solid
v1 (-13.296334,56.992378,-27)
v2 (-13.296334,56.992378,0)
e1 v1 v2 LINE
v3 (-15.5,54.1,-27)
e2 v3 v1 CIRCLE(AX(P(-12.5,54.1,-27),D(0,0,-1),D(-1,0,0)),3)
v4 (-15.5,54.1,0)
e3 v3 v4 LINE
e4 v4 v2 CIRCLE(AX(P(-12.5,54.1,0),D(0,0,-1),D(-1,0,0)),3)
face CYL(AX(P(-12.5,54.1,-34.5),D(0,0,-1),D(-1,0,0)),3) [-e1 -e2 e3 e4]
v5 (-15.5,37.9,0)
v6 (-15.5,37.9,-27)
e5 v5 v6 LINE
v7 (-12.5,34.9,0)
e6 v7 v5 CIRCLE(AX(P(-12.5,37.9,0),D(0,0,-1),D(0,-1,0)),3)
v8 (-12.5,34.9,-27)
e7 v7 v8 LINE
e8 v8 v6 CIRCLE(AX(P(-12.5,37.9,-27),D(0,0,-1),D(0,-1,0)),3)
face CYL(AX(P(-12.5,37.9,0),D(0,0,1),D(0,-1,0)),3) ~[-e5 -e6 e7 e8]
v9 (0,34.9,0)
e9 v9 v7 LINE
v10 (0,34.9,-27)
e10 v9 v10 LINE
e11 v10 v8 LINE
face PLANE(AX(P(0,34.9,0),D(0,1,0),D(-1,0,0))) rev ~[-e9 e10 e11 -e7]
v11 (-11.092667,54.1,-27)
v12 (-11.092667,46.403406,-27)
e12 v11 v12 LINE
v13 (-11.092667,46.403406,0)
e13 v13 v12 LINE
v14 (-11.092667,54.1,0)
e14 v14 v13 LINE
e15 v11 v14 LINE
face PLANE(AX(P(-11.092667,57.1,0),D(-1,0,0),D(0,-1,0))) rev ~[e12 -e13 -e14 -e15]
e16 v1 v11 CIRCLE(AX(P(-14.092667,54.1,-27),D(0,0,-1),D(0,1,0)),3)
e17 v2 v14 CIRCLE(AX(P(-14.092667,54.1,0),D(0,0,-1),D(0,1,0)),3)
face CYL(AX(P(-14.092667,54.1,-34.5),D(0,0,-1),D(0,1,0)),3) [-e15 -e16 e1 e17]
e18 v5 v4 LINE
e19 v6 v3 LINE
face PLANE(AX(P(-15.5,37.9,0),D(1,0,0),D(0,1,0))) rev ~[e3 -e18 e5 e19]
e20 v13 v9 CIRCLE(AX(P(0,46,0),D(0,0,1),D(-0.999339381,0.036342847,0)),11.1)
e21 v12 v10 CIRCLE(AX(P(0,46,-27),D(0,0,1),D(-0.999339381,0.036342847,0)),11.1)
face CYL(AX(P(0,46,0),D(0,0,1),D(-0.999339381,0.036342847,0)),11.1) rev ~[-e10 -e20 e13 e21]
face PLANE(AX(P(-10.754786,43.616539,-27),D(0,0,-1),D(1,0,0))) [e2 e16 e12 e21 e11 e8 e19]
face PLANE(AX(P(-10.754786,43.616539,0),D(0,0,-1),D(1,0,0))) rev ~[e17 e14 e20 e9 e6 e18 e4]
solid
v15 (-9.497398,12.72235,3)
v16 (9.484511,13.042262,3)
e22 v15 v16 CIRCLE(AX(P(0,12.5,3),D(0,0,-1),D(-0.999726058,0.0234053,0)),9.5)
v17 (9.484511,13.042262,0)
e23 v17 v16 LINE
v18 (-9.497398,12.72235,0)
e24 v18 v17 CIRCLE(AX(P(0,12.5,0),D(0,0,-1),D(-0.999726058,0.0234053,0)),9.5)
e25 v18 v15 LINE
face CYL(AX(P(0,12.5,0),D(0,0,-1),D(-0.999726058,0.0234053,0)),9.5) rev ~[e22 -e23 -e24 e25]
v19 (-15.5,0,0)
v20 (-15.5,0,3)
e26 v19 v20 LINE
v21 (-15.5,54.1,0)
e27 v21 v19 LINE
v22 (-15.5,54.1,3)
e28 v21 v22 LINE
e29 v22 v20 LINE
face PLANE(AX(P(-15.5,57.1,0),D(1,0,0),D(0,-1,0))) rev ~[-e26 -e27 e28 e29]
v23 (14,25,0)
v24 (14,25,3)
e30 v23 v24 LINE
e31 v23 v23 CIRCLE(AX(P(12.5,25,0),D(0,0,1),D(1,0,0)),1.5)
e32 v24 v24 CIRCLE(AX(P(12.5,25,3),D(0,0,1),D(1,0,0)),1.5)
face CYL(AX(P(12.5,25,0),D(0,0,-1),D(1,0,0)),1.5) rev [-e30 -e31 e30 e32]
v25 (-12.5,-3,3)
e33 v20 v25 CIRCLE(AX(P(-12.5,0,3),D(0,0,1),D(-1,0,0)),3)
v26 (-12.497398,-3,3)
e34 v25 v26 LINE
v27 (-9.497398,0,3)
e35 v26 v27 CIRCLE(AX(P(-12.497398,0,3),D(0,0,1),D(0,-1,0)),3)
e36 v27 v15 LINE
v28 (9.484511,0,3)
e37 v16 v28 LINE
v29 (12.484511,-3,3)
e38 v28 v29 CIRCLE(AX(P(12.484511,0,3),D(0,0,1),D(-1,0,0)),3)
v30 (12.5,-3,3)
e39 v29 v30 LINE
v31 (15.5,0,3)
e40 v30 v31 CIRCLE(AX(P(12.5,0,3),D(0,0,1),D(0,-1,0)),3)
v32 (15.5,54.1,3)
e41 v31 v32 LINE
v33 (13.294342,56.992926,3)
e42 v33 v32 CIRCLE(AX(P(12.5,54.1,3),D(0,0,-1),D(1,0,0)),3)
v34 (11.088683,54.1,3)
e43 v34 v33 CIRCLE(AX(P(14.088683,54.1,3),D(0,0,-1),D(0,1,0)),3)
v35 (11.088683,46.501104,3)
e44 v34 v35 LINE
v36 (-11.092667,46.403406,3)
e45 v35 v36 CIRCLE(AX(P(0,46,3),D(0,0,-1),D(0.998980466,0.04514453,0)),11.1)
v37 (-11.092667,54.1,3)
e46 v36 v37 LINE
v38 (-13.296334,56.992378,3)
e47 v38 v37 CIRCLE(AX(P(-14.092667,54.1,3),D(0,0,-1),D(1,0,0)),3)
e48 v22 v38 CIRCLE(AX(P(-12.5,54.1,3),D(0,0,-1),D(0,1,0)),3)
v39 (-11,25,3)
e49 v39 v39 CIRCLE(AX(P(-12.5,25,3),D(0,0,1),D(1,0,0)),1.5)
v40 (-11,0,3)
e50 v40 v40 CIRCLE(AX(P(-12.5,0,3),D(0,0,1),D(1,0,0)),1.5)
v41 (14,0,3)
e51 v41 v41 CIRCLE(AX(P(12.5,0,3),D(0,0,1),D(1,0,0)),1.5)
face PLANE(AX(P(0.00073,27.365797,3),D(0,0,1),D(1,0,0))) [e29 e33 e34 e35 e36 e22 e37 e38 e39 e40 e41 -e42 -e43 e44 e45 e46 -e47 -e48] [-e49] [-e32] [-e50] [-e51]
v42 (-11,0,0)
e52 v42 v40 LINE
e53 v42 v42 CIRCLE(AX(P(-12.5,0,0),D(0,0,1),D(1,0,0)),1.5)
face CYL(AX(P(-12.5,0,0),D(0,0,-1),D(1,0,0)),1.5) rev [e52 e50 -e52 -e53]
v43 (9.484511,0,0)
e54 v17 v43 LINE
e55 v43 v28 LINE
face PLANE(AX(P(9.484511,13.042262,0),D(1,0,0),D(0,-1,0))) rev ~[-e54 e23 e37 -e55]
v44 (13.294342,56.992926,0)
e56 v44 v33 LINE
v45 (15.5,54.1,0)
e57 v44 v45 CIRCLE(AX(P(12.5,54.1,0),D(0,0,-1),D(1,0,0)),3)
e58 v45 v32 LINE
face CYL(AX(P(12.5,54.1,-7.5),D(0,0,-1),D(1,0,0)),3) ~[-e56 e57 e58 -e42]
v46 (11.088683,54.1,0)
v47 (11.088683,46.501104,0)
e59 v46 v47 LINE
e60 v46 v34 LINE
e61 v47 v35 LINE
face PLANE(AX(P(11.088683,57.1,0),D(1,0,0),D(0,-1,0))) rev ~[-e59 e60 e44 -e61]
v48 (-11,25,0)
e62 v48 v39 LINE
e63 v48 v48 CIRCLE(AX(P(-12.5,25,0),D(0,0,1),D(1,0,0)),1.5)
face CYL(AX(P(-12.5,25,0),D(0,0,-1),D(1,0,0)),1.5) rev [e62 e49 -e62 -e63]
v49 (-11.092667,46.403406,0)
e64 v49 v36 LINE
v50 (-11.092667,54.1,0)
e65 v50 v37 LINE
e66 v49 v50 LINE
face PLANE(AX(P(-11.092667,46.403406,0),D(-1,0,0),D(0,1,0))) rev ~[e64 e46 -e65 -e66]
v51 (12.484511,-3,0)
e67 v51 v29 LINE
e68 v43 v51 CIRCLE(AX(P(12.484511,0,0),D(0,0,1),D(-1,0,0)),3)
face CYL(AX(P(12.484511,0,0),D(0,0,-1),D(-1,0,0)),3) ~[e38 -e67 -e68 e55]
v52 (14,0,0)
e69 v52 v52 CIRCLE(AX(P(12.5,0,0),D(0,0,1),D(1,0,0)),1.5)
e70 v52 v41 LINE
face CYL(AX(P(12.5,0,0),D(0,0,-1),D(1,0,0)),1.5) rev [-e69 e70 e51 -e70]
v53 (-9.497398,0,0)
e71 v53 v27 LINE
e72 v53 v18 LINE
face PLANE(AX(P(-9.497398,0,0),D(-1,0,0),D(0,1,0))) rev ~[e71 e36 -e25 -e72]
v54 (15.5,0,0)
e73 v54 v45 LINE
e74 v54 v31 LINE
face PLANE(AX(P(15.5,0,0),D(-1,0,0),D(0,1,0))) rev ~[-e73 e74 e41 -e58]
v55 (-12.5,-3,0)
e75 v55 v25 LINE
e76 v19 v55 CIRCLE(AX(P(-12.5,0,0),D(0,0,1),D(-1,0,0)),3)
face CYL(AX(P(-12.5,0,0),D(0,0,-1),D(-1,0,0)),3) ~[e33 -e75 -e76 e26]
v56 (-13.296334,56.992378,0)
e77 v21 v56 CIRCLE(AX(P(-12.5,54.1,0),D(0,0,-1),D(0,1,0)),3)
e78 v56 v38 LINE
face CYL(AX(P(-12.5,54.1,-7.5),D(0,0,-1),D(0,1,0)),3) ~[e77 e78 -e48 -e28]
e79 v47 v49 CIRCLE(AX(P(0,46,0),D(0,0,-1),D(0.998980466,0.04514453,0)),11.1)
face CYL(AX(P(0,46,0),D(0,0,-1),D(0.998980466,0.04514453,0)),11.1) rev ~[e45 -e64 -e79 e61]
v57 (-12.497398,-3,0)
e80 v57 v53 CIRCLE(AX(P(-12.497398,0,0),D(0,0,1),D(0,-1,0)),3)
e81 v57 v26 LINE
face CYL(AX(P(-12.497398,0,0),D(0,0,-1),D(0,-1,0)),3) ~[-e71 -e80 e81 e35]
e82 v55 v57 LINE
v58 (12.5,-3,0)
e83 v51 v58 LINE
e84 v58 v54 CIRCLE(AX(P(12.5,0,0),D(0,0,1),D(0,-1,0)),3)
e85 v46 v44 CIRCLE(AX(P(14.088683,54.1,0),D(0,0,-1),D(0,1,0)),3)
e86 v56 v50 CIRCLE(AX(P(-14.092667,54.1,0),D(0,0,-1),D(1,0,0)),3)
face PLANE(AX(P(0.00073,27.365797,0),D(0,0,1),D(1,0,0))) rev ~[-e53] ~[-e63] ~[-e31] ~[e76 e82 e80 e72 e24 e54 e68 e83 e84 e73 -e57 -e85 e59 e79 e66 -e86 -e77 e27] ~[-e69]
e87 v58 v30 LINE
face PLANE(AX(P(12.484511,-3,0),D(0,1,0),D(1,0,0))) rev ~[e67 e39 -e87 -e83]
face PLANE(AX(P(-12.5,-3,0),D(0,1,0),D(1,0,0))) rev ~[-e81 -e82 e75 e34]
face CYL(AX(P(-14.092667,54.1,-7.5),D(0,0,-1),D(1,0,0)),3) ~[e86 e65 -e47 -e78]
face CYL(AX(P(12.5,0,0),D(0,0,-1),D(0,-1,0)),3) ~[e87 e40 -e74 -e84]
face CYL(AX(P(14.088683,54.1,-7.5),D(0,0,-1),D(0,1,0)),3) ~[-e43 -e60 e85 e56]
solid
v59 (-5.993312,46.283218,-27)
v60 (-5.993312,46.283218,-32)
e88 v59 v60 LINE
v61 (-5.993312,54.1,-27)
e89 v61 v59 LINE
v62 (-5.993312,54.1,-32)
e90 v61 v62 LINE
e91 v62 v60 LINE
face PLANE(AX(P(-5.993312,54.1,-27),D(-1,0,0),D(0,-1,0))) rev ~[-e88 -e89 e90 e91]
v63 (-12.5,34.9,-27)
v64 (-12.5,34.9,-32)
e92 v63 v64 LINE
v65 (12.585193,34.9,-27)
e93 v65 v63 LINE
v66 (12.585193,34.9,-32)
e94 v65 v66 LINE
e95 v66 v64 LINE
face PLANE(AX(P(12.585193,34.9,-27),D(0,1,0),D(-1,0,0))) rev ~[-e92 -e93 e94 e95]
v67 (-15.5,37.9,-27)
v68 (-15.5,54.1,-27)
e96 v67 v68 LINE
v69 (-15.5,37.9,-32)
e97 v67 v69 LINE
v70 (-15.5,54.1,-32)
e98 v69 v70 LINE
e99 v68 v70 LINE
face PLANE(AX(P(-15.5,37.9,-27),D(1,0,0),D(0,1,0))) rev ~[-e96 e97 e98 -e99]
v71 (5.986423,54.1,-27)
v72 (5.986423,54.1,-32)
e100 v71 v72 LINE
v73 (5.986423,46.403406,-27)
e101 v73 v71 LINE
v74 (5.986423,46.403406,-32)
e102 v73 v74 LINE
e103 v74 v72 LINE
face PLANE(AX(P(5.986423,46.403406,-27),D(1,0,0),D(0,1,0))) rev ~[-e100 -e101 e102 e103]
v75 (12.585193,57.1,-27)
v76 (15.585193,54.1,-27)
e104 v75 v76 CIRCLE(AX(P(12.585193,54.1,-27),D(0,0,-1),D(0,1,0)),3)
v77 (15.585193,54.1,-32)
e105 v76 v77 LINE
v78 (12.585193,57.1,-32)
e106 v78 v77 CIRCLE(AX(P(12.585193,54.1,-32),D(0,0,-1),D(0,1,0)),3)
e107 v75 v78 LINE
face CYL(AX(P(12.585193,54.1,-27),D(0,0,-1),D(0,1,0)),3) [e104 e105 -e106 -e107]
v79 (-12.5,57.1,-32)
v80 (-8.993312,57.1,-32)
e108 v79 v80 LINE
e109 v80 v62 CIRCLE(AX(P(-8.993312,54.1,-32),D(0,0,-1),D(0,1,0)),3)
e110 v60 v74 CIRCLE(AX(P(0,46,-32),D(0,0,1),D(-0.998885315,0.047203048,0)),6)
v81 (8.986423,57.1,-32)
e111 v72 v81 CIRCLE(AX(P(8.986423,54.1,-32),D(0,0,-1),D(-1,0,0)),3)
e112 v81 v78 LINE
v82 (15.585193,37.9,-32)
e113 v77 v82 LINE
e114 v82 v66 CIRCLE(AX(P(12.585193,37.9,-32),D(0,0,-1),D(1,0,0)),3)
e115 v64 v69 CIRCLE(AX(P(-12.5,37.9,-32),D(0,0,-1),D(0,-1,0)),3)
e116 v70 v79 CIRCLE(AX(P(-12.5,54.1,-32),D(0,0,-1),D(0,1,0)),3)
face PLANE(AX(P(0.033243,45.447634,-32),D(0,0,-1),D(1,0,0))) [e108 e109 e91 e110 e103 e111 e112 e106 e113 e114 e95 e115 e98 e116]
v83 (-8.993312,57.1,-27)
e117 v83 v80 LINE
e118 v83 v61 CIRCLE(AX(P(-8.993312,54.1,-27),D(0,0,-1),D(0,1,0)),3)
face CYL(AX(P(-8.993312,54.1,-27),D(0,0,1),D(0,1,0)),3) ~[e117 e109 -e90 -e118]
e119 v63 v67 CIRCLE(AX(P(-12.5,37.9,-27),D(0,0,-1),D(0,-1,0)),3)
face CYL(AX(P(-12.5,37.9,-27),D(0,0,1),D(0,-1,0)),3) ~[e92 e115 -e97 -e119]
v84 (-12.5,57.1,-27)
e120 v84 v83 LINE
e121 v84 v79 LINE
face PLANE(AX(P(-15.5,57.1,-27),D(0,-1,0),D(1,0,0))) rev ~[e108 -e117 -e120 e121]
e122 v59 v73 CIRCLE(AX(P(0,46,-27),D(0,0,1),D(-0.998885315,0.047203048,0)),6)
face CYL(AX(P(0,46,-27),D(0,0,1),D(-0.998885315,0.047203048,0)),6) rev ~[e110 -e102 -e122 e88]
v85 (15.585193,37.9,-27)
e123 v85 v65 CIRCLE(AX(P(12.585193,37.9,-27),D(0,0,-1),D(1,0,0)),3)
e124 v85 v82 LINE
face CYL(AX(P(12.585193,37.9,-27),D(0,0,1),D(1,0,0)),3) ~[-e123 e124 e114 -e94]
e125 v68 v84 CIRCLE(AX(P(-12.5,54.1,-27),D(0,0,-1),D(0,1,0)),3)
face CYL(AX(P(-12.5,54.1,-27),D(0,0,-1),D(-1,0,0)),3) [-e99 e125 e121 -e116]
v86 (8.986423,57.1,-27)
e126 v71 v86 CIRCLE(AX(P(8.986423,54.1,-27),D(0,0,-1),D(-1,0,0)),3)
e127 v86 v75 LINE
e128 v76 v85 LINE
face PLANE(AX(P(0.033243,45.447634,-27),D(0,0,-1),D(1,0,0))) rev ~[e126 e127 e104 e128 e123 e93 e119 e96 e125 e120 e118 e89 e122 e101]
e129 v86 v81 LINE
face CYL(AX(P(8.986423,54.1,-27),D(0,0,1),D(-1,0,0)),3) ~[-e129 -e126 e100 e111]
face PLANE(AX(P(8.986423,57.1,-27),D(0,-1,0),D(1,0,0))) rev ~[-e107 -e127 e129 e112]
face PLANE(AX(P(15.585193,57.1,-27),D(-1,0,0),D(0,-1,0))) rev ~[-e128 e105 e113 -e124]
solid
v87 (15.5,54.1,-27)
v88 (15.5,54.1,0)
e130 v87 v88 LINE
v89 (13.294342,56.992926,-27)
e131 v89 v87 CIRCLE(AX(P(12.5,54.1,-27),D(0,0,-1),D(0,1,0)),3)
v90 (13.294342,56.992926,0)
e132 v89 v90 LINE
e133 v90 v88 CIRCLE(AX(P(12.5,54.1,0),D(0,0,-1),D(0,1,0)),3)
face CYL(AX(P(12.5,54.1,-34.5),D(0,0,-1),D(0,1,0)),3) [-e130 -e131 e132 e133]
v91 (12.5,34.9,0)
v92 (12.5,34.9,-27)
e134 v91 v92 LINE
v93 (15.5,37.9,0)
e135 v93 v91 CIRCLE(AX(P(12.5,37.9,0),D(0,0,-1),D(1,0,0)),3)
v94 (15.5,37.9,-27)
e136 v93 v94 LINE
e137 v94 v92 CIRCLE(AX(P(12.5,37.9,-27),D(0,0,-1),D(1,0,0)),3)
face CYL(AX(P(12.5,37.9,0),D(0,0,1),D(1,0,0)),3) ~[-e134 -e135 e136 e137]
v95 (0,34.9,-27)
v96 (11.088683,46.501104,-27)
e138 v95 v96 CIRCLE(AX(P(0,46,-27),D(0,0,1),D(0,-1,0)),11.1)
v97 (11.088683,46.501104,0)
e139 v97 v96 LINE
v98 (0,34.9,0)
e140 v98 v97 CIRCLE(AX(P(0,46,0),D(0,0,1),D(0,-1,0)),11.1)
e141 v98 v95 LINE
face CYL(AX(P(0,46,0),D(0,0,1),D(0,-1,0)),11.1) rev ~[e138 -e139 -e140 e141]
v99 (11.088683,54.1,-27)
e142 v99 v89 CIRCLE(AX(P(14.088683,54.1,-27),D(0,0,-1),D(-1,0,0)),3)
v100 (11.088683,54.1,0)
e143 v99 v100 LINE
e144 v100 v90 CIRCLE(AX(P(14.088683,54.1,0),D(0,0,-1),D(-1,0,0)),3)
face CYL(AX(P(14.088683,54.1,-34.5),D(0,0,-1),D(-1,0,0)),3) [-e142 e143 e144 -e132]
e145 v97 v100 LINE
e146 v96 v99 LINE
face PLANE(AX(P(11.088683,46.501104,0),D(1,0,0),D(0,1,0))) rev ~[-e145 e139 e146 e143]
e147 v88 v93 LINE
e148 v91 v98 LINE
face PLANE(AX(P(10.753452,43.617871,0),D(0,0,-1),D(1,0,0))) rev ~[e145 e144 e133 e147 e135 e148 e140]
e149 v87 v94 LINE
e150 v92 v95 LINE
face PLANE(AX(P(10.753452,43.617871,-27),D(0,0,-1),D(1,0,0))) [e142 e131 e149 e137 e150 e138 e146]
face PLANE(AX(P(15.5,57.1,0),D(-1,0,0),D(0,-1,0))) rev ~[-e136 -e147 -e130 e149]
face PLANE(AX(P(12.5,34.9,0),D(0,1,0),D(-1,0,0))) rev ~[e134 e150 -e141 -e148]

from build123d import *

# Parameters (mm, degrees)
F0_R          = 1.5
F1_DEPTH      = 3
F3_DEPTH      = 27
F5_DEPTH      = 5
F6_F1_R       = 3
F6_F2_R       = 3
F6_2_T1_DEPTH = 42
F6_3_T1_DEPTH = 18
F6_4_T1_DEPTH = 42


# Not quite as in the source:
# - a fillet or chamfer that OpenCascade refuses, or shapes differently, is made with other operations: its cross-section is extruded or revolved along the edge and cut away or added


with BuildPart() as f1:
    # F0 (on Top) → F1 (new body)
    with BuildSketch(Plane.XY):
        with BuildLine():
            Line((-11.0926671237, 57.1), (-15.5, 57.1))
            Line((-15.5, 57.1), (-15.5, 0))
            ThreePointArc((-15.5, 0), (-14.6213203436, -2.1213203436), (-12.5, -3))
            Line((-12.5, -3), (-12.4973975552, -3))
            ThreePointArc((-12.4973975552, -3), (-10.3760772117, -2.1213203436), (-9.4973975552, 0))
            Line((-9.4973975552, 0), (-9.4973975552, 12.2776496511))
            ThreePointArc((-9.4973975552, 12.2776496511), (-9.5, 12.5), (-9.4973975552, 12.7223503489))
            ThreePointArc((-9.4973975552, 12.7223503489), (-0.1600853698, 21.9986510976), (9.4845111786, 13.0422616551))
            ThreePointArc((9.4845111786, 13.0422616551), (9.5, 12.5), (9.4845111786, 11.9577383449))
            Line((9.4845111786, 11.9577383449), (9.4845111786, 0))
            ThreePointArc((9.4845111786, 0), (10.3631908351, -2.1213203436), (12.4845111786, -3))
            Line((12.4845111786, -3), (12.5, -3))
            ThreePointArc((12.5, -3), (14.6213203436, -2.1213203436), (15.5, 0))
            Line((15.5, 0), (15.5, 57.1))
            Line((15.5, 57.1), (11.0886831726, 57.1))
            Line((11.0886831726, 57.1), (11.0886831726, 46.5011042794))
            ThreePointArc((11.0886831726, 46.5011042794), (0.0488899344, 34.9001076683), (-11.0926671237, 46.4034056054))
            Line((-11.0926671237, 46.4034056054), (-11.0926671237, 57.1))
        make_face()
        with Locations((-12.5, 0)):
            Circle(F0_R, mode=Mode.SUBTRACT)
        with Locations((-12.5, 25)):
            Circle(F0_R, mode=Mode.SUBTRACT)
        with Locations((12.5, 0)):
            Circle(F0_R, mode=Mode.SUBTRACT)
        with Locations((12.5, 25)):
            Circle(F0_R, mode=Mode.SUBTRACT)
        with BuildLine():
            ThreePointArc((-9.4973975552, 12.7223503489), (-9.5, 12.5), (-9.4973975552, 12.2776496511))
            Line((-9.4973975552, 12.2776496511), (-9.4973975552, 12.7223503489))
        make_face()
        with BuildLine():
            ThreePointArc((9.4845111786, 11.9577383449), (9.5, 12.5), (9.4845111786, 13.0422616551))
            Line((9.4845111786, 13.0422616551), (9.4845111786, 11.9577383449))
        make_face()
    extrude(amount=F1_DEPTH)

    # F6#3: fillet of radius 3 on 4 edges, made by hand

    # F6_3_s2 → F6_3_t1 (cut)
    with BuildSketch(Plane.XY.offset(-7.5)):
        with BuildLine():
            ThreePointArc((-12.5, 57.1), (-14.6213203436, 56.2213203436), (-15.5, 54.1))
            Line((-15.5, 54.1), (-15.5, 57.1))
            Line((-15.5, 57.1), (-12.5, 57.1))
        make_face()
        with BuildLine():
            ThreePointArc((-11.0926671237, 54.1), (-11.9713467802, 56.2213203436), (-14.0926671237, 57.1))
            Line((-14.0926671237, 57.1), (-11.0926671237, 57.1))
            Line((-11.0926671237, 57.1), (-11.0926671237, 54.1))
        make_face()
        with BuildLine():
            ThreePointArc((14.0886831726, 57.1), (11.967362829, 56.2213203436), (11.0886831726, 54.1))
            Line((11.0886831726, 54.1), (11.0886831726, 57.1))
            Line((11.0886831726, 57.1), (14.0886831726, 57.1))
        make_face()
        with BuildLine():
            ThreePointArc((15.5, 54.1), (14.6213203436, 56.2213203436), (12.5, 57.1))
            Line((12.5, 57.1), (15.5, 57.1))
            Line((15.5, 57.1), (15.5, 54.1))
        make_face()
    extrude(amount=F6_3_T1_DEPTH, mode=Mode.SUBTRACT)


with BuildPart() as f3:
    # F2 (on face) → F3 (new body)
    with BuildSketch(Plane(origin=(0, 0, 0), x_dir=(1, 0, 0), z_dir=(0, 0, -1))):
        with BuildLine():
            ThreePointArc((-11.0926671237, -46.4034056054), (-7.9902378632, -38.2950600982), (0, -34.9))
            Line((0, -34.9), (-12.5, -34.9))
            ThreePointArc((-12.5, -34.9), (-14.6213203436, -35.7786796564), (-15.5, -37.9))
            Line((-15.5, -37.9), (-15.5, -57.1))
            Line((-15.5, -57.1), (-11.0926671237, -57.1))
            Line((-11.0926671237, -57.1), (-11.0926671237, -46.4034056054))
        make_face()
    extrude(amount=F3_DEPTH)

    # F6#2: fillet of radius 3 on 2 edges, made by hand

    # F6_2_s2 → F6_2_t1 (cut)
    with BuildSketch(Plane.XY.offset(-34.5)):
        with BuildLine():
            ThreePointArc((-15.5, 54.1), (-14.6213203436, 56.2213203436), (-12.5, 57.1))
            Line((-12.5, 57.1), (-15.5, 57.1))
            Line((-15.5, 57.1), (-15.5, 54.1))
        make_face()
        with BuildLine():
            ThreePointArc((-14.0926671237, 57.1), (-11.9713467802, 56.2213203436), (-11.0926671237, 54.1))
            Line((-11.0926671237, 54.1), (-11.0926671237, 57.1))
            Line((-11.0926671237, 57.1), (-14.0926671237, 57.1))
        make_face()
    extrude(amount=F6_2_T1_DEPTH, mode=Mode.SUBTRACT)


with BuildPart() as f3b:
    # F2 (on face) → F3, piece 2 (new body)
    with BuildSketch(Plane(origin=(0, 0, 0), x_dir=(1, 0, 0), z_dir=(0, 0, -1))):
        with BuildLine():
            Line((12.5, -34.9), (0, -34.9))
            ThreePointArc((0, -34.9), (8.0240967561, -38.3303278265), (11.0886831726, -46.5011042794))
            Line((11.0886831726, -46.5011042794), (11.0886831726, -57.1))
            Line((11.0886831726, -57.1), (15.5, -57.1))
            Line((15.5, -57.1), (15.5, -37.9))
            ThreePointArc((15.5, -37.9), (14.6213203436, -35.7786796564), (12.5, -34.9))
        make_face()
    extrude(amount=F3_DEPTH)

    # F6#4: fillet of radius 3 on 2 edges, made by hand

    # F6_4_s2 → F6_4_t1 (cut)
    with BuildSketch(Plane.XY.offset(-34.5)):
        with BuildLine():
            ThreePointArc((11.0886831726, 54.1), (11.967362829, 56.2213203436), (14.0886831726, 57.1))
            Line((14.0886831726, 57.1), (11.0886831726, 57.1))
            Line((11.0886831726, 57.1), (11.0886831726, 54.1))
        make_face()
        with BuildLine():
            ThreePointArc((12.5, 57.1), (14.6213203436, 56.2213203436), (15.5, 54.1))
            Line((15.5, 54.1), (15.5, 57.1))
            Line((15.5, 57.1), (12.5, 57.1))
        make_face()
    extrude(amount=F6_4_T1_DEPTH, mode=Mode.SUBTRACT)


with BuildPart() as f5:
    # F4 (on face) → F5 (new body)
    with BuildSketch(Plane(origin=(0, 0, -27), x_dir=(1, 0, 0), z_dir=(0, 0, -1))):
        with BuildLine():
            ThreePointArc((-5.9933118892, -46.2832182873), (0.0601922838, -40.0003019335), (5.9864232992, -46.4034056054))
            Line((5.9864232992, -46.4034056054), (5.9864232992, -54.1))
            ThreePointArc((5.9864232992, -54.1), (6.8651029557, -56.2213203436), (8.9864232992, -57.1))
            Line((8.9864232992, -57.1), (15.5851934105, -57.1))
            Line((15.5851934105, -57.1), (15.5851934105, -37.9))
            ThreePointArc((15.5851934105, -37.9), (14.7065137541, -35.7786796564), (12.5851934105, -34.9))
            Line((12.5851934105, -34.9), (0, -34.9))
            Line((0, -34.9), (-12.5, -34.9))
            ThreePointArc((-12.5, -34.9), (-14.6213203436, -35.7786796564), (-15.5, -37.9))
            Line((-15.5, -37.9), (-15.5, -57.1))
            Line((-15.5, -57.1), (-8.9933118892, -57.1))
            ThreePointArc((-8.9933118892, -57.1), (-6.8719915457, -56.2213203436), (-5.9933118892, -54.1))
            Line((-5.9933118892, -54.1), (-5.9933118892, -46.2832182873))
        make_face()
    extrude(amount=F5_DEPTH)

    # F6: fillet of radius 3 on 2 edges, made by hand

    # F6_f1
    f6_f1_edges = [f5.edges().sort_by_distance(p)[0] for p in [
        (15.5851934105, 57.1, -29.5),
    ]]
    fillet(f6_f1_edges, radius=F6_F1_R)

    # F6_f2
    f6_f2_edges = [f5.edges().sort_by_distance(p)[0] for p in [
        (-15.5, 57.1, -29.5),
    ]]
    fillet(f6_f2_edges, radius=F6_F2_R)


solid = Compound([f1.part, f3.part, f3b.part, f5.part])
